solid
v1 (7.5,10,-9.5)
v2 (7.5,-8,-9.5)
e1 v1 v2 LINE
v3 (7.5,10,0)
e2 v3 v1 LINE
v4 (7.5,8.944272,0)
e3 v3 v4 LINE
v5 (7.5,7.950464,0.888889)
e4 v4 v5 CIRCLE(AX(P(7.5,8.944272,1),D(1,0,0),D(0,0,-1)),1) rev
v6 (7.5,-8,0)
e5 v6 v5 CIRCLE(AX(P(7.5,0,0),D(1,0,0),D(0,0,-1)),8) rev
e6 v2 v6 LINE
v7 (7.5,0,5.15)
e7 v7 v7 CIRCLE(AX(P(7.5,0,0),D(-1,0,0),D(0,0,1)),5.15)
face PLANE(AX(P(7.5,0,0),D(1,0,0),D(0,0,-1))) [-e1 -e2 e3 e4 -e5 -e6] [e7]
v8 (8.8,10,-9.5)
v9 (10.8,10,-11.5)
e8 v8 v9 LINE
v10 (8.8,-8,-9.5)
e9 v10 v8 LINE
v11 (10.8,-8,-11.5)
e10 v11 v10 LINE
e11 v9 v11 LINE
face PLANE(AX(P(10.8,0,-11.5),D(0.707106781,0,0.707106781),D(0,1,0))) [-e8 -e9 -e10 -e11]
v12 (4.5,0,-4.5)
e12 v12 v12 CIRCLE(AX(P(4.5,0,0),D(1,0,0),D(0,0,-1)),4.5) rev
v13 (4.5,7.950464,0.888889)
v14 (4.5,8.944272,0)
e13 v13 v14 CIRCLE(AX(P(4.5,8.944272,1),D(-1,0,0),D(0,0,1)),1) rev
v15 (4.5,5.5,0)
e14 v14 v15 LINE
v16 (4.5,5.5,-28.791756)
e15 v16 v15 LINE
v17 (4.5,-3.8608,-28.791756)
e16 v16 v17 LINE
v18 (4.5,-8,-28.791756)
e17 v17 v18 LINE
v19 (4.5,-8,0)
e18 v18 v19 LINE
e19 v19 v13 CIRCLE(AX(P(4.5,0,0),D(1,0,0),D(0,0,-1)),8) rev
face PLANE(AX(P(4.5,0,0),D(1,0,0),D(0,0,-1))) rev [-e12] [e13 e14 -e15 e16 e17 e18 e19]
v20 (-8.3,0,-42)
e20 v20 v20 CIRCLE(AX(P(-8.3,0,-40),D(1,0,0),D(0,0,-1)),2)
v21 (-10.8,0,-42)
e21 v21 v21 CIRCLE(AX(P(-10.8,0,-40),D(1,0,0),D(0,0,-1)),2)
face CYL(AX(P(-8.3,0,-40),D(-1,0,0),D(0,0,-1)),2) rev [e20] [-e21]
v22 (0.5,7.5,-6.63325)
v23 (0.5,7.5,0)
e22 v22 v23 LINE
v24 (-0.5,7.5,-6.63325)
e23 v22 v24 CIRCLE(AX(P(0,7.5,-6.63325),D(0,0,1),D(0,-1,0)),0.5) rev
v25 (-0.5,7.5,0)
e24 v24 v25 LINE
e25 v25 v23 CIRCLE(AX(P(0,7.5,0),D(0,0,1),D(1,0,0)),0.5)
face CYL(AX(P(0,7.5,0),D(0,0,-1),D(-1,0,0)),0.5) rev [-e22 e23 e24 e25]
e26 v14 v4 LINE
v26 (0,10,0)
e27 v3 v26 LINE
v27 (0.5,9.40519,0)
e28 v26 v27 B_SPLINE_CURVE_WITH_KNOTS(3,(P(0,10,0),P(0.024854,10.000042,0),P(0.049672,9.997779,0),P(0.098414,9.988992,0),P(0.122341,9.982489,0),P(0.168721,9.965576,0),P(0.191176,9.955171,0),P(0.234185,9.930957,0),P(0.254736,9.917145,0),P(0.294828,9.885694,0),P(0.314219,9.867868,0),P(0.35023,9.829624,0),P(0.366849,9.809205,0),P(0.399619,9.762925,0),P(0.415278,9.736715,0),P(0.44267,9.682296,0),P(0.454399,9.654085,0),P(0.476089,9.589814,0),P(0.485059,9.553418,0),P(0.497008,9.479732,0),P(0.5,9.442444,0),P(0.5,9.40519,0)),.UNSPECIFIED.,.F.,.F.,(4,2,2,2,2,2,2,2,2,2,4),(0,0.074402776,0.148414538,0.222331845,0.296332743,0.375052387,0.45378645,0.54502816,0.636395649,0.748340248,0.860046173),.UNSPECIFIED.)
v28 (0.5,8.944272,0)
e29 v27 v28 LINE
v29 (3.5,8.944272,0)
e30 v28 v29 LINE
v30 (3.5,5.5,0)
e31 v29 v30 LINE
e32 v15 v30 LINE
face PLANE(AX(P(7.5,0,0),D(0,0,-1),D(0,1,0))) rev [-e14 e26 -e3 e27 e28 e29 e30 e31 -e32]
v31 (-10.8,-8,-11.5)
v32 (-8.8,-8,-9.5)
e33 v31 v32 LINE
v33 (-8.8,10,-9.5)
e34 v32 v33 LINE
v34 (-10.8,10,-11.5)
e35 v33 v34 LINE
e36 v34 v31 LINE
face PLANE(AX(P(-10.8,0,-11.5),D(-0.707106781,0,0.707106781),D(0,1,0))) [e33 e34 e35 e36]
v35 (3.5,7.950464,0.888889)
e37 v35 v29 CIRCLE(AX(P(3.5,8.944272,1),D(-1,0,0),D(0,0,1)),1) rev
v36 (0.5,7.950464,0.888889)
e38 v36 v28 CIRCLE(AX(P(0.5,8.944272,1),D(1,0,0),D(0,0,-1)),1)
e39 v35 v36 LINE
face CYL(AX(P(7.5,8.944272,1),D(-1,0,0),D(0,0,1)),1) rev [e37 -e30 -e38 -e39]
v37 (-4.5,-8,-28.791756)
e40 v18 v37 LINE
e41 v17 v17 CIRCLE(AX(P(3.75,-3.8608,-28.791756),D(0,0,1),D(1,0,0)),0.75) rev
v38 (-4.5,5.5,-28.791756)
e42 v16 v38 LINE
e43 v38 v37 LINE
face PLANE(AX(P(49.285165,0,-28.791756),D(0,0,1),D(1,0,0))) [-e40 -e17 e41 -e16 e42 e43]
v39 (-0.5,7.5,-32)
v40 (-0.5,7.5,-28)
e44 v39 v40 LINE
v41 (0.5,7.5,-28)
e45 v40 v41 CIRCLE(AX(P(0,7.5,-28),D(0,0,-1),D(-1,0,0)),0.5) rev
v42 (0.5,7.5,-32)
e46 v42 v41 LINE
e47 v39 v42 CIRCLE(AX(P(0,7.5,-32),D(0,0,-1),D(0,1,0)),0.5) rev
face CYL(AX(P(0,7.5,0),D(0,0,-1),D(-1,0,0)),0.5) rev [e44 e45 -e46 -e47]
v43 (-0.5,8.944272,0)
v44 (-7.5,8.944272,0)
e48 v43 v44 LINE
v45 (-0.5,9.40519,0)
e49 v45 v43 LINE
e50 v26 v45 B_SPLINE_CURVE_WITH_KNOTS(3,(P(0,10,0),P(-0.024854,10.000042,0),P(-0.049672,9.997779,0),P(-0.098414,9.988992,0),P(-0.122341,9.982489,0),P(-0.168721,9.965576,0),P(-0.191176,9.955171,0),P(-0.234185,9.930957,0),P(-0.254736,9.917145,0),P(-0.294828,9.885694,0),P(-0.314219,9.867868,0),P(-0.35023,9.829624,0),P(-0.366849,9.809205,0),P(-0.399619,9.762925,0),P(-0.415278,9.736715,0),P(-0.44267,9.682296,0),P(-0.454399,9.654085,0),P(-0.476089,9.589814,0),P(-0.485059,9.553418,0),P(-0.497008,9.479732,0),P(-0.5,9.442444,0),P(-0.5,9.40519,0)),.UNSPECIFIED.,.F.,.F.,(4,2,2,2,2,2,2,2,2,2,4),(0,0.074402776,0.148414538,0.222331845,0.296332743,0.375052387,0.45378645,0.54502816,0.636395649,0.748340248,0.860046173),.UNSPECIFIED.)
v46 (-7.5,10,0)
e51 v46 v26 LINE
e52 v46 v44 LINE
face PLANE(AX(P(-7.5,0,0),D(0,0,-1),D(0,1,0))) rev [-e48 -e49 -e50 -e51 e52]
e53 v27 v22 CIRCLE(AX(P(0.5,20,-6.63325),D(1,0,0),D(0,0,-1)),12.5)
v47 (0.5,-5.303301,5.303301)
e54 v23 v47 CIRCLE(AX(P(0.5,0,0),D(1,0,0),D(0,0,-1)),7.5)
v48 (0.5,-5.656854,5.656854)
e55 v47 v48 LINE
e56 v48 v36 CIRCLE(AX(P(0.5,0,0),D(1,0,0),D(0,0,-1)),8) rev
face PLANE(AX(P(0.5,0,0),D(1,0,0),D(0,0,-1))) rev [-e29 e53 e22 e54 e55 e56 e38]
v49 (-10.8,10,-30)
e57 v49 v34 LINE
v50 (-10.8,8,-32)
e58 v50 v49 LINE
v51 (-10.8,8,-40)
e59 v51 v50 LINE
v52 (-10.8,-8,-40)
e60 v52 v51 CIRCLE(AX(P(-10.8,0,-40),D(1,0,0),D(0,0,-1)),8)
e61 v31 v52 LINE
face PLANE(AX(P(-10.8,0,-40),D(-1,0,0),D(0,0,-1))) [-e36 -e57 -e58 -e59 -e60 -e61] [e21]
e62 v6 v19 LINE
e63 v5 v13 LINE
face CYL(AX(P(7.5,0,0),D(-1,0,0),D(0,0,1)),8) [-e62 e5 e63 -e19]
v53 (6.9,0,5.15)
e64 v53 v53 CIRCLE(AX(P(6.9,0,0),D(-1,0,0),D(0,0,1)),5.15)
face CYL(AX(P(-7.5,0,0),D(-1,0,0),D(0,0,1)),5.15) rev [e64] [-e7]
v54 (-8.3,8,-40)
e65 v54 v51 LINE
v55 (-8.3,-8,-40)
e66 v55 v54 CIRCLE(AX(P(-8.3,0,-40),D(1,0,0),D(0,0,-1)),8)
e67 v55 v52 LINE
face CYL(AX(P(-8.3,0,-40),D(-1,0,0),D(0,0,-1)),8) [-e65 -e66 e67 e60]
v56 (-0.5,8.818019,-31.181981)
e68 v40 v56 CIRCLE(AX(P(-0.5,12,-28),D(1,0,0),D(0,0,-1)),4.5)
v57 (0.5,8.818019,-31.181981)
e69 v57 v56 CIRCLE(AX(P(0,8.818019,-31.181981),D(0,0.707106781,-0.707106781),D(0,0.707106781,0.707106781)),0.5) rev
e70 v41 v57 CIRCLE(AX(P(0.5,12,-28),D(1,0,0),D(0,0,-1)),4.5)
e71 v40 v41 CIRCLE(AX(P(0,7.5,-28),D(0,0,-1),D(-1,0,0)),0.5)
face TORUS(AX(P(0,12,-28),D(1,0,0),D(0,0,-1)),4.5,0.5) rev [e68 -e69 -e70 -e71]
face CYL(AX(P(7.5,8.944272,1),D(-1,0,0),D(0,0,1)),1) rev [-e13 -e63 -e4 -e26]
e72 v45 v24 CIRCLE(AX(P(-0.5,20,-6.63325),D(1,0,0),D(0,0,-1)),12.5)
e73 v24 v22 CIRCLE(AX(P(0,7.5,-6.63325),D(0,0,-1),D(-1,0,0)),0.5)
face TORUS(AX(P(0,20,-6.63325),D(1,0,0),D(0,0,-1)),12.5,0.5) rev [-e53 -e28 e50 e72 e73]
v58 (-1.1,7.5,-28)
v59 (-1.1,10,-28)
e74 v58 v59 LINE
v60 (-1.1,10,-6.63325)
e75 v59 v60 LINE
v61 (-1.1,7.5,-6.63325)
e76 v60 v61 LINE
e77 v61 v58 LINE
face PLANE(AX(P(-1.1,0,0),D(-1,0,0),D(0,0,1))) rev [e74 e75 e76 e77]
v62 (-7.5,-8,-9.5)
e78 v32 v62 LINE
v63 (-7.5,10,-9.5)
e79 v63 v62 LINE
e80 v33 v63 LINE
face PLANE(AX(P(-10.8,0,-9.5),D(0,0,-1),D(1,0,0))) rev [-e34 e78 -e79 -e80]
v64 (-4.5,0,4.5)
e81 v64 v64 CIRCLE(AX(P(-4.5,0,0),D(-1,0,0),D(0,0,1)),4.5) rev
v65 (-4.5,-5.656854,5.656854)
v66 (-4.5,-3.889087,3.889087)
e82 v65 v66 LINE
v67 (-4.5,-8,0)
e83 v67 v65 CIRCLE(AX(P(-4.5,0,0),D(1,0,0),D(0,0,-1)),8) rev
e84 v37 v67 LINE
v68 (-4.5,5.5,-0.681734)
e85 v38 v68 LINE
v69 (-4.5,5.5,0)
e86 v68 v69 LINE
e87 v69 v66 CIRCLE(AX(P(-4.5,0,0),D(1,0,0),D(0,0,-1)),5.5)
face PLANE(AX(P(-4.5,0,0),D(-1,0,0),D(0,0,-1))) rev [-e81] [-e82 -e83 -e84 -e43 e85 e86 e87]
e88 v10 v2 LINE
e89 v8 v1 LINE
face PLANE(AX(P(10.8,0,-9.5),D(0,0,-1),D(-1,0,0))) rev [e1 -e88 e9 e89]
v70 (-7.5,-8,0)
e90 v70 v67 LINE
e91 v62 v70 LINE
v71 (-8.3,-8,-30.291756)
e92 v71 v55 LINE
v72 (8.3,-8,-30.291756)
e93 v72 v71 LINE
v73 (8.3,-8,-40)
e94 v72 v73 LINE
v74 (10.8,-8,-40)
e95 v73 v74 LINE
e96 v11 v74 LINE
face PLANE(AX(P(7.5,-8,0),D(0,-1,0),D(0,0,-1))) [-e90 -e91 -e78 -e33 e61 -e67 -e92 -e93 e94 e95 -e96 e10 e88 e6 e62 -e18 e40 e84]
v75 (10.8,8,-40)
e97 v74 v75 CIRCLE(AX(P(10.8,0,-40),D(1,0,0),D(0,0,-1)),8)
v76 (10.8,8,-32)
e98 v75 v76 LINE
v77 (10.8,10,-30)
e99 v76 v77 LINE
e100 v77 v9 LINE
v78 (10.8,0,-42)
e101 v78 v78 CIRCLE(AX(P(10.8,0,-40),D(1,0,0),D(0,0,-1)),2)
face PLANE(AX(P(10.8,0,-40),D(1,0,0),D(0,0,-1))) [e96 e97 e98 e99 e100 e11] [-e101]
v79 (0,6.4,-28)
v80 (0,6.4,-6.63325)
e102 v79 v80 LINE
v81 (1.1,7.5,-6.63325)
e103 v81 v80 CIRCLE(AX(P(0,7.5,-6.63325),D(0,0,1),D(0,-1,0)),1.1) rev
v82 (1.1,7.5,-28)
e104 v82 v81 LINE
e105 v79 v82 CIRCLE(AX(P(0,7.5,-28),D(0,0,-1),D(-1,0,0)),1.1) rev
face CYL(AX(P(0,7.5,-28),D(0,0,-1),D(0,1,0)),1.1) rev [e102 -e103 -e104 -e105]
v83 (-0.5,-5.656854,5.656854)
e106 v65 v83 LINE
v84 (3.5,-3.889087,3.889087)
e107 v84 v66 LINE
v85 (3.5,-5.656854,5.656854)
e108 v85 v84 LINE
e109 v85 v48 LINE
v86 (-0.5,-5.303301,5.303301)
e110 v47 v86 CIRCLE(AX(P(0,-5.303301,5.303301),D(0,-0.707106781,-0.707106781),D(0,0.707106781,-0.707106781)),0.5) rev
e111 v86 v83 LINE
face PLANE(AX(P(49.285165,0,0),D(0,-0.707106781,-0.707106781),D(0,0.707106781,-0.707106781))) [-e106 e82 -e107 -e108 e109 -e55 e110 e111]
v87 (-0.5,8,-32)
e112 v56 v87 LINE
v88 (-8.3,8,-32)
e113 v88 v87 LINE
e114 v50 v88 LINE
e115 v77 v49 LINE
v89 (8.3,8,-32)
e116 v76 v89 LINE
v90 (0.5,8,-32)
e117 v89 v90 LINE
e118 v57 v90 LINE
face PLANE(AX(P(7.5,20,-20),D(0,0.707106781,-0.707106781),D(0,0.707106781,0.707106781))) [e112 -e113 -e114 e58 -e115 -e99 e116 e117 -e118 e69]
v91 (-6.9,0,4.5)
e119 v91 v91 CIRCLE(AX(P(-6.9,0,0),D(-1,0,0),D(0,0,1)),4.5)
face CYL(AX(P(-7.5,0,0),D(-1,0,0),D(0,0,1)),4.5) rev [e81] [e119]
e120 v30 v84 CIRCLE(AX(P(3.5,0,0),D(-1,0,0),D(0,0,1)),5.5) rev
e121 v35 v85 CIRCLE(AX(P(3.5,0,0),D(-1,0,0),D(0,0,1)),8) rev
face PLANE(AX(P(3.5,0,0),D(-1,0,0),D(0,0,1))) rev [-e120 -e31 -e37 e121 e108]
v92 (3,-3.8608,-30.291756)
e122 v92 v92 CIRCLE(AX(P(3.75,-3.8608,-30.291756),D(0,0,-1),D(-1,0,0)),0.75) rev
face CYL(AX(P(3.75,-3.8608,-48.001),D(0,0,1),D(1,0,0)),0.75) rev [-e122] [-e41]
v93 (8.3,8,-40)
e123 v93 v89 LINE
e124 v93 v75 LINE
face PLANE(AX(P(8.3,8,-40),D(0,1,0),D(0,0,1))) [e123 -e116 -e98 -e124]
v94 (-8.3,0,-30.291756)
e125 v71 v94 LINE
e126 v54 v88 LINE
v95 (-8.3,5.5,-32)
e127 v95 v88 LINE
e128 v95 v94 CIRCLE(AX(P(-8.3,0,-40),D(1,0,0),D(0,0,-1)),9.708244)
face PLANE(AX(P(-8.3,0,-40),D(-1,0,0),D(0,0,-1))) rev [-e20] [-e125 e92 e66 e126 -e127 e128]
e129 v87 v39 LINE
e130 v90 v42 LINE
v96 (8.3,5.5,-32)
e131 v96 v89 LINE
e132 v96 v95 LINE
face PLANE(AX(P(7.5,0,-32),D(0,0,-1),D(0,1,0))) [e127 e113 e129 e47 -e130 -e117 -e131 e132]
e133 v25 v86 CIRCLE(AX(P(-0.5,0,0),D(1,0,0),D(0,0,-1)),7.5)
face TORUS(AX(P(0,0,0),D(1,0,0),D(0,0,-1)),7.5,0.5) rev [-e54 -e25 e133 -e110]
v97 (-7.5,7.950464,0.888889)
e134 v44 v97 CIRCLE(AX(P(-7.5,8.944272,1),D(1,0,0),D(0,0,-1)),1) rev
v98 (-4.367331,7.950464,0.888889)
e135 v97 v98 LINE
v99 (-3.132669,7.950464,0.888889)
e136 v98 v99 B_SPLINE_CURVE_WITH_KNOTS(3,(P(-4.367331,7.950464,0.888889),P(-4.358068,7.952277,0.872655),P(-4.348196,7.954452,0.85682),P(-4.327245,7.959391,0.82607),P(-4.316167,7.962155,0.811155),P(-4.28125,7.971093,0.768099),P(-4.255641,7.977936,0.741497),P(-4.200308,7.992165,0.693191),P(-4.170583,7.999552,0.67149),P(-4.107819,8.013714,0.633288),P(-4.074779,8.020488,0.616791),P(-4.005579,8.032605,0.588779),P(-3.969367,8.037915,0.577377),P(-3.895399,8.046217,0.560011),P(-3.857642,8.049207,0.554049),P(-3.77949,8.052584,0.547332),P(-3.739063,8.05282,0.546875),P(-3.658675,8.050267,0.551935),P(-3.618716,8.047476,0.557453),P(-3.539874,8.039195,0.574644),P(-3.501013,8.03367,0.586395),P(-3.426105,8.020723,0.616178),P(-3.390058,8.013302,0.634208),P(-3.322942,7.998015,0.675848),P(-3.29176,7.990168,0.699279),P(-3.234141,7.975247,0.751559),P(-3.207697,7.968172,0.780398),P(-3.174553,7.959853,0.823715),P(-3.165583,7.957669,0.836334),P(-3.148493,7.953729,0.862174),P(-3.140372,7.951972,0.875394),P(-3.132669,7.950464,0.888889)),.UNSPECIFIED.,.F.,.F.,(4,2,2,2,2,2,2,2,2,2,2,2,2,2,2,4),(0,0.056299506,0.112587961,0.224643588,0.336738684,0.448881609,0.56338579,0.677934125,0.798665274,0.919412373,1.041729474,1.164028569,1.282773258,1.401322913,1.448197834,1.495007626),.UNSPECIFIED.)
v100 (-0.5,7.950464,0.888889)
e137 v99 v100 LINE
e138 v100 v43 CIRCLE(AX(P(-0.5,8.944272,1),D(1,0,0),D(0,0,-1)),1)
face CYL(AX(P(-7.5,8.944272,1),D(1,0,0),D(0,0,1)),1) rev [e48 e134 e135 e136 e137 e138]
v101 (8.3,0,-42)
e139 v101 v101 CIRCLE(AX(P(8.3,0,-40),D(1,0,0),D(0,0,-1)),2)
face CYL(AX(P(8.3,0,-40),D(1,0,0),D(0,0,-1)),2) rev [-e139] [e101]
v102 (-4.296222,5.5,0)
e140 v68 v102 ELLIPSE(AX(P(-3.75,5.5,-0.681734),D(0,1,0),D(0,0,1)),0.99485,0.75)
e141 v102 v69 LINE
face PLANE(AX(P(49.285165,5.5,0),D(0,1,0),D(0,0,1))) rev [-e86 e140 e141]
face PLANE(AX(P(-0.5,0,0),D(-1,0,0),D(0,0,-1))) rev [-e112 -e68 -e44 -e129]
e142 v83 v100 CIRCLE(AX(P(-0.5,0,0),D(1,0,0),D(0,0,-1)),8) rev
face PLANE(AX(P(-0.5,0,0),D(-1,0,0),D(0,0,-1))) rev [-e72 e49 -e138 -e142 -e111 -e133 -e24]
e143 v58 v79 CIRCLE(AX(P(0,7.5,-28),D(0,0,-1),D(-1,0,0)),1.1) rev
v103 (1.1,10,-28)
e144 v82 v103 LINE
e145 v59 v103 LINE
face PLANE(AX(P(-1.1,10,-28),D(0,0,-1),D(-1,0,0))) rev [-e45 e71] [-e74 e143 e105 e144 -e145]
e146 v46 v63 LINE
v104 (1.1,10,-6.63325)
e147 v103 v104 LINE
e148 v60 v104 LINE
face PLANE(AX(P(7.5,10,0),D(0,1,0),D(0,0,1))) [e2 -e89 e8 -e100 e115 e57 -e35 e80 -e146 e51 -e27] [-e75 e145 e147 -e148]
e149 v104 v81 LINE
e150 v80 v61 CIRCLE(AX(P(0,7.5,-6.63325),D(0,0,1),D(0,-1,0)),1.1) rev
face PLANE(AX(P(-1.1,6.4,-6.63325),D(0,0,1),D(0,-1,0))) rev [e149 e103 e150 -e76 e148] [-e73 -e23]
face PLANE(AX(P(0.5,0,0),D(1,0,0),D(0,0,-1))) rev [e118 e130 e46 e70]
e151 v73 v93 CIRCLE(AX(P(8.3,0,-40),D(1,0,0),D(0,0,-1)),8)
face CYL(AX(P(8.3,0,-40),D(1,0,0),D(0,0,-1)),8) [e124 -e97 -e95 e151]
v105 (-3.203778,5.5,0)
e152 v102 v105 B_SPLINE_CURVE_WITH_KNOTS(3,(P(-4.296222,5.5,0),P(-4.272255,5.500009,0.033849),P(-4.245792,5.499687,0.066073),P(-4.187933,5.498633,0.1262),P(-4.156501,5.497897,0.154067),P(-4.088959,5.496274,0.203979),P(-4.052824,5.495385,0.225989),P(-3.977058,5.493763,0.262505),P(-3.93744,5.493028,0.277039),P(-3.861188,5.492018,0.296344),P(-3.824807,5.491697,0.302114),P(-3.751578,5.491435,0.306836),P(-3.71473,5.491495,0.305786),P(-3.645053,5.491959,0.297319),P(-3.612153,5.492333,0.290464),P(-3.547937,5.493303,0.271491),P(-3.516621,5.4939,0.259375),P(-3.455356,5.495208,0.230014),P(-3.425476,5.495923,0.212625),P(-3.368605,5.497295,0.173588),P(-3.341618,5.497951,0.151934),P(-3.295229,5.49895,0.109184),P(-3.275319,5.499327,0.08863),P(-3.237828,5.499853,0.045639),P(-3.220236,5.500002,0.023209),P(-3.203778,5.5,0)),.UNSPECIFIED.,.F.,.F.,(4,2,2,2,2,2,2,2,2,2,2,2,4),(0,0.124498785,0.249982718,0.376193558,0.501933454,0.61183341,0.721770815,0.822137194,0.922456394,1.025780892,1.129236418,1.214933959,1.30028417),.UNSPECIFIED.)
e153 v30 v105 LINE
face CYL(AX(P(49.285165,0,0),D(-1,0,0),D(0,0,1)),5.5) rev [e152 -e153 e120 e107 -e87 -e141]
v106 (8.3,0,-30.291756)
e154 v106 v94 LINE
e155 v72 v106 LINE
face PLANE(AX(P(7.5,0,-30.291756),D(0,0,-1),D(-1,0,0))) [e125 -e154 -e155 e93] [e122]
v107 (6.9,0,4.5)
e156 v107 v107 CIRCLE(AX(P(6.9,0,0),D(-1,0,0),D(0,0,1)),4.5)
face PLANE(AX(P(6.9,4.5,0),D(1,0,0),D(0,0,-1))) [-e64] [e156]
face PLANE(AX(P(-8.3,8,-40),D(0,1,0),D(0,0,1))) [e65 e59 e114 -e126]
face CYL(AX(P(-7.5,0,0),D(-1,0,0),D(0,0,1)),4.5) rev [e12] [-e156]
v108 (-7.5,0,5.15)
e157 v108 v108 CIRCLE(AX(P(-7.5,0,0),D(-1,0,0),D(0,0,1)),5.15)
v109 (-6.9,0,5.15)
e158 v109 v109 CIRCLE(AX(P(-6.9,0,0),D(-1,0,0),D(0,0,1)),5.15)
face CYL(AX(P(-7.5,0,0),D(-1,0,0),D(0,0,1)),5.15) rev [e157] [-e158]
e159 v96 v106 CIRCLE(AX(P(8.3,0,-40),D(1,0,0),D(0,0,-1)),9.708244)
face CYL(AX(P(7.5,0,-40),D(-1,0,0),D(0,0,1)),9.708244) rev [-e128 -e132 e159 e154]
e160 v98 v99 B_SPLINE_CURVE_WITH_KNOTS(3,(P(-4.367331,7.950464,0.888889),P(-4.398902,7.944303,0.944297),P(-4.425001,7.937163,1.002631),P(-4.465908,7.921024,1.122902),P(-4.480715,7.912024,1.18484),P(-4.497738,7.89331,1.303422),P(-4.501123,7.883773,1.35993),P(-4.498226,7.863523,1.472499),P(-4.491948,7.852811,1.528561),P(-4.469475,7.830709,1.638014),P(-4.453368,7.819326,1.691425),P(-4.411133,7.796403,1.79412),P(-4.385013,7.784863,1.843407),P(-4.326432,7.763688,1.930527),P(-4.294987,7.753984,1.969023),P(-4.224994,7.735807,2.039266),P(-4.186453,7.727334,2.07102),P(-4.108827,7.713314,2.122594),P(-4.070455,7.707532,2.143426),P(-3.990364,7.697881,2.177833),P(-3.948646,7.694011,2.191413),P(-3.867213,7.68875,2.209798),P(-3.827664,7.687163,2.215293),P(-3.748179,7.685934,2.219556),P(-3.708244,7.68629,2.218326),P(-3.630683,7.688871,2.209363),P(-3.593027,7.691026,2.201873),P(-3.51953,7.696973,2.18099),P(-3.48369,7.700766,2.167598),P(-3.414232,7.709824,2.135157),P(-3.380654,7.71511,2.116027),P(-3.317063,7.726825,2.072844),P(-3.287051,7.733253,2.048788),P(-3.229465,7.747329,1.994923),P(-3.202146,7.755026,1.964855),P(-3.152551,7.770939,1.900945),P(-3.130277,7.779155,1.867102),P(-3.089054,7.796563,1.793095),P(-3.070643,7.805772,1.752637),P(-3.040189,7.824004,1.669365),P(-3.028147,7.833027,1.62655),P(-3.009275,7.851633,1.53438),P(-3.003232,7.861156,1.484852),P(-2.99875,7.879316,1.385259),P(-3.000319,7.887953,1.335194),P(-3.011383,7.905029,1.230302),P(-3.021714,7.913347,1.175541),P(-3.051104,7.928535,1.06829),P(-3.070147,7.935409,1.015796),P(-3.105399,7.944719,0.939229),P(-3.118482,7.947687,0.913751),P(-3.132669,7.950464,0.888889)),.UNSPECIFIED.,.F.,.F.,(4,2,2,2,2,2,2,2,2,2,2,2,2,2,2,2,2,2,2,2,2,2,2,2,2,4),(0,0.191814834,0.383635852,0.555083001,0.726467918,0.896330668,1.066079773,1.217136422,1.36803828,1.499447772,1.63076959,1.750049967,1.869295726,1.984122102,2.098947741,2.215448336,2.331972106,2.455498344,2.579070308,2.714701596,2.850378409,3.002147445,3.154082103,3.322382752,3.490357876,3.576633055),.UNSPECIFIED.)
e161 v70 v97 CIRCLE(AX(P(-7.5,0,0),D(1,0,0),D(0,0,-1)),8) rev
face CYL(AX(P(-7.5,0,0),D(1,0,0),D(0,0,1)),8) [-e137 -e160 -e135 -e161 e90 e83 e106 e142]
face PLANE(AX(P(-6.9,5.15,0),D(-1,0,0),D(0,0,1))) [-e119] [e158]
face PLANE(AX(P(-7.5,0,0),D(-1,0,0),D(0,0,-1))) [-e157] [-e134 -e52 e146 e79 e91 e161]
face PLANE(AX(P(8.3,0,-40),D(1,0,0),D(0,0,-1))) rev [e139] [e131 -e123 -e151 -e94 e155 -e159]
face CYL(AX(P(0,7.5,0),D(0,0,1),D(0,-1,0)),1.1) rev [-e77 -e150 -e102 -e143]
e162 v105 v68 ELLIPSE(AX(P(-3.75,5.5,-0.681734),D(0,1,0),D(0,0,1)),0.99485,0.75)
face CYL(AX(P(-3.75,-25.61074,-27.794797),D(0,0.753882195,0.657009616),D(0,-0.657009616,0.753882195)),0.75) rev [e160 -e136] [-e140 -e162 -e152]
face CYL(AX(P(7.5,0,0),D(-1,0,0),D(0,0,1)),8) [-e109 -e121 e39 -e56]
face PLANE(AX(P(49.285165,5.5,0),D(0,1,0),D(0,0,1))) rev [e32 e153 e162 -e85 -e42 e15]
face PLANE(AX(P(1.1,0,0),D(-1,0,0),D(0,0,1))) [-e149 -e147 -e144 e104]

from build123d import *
from build123d.topology import SkipClean

# Parameters (mm, degrees)
BOSS_EXTRU_1_START      = 4.5
ESQUISSE1_R             = 2
BOSS_EXTRU_1_DEPTH      = 3
BOSS_EXTRU_2_START      = 7.5
BOSS_EXTRU_2_DEPTH      = 3.3
BOSS_EXTRU_5_START      = 8.3
ESQUISSE1_12_R          = 2
BOSS_EXTRU_5_DEPTH      = 2.5
BOSS_EXTRU_3_DEPTH      = 7.5
BOSS_EXTRU_4_START      = 0.5
BOSS_EXTRU_4_DEPTH      = 7
CONG_4_R                = 12
FILLET1_R               = 0.5
FILLET2_R               = 1
CHAMFER1_SIZE           = 2
ENL_V_START             = 4.5
ESQUISSE2_W             = 8
ESQUISSE2_H             = 18
ENL_V_MAT_EXTRU_1_DEPTH = 1
ENL_V_MAT_EXTRU_3_REACH = 52.206
ESQUISSE4_R             = 0.75
ESQUISSE5_W             = 21.366750419
ESQUISSE5_H             = 3.6
ENL_V_MAT_EXTRU_4_DEPTH = 1.1
CONG_5_R                = 1.1
ENL_V_MAT_EXTRU_5_REACH = 59.505
ESQUISSE12_R            = 0.75


# Some blends are built 0.0001 mm under size
with BuildPart() as part:
    # Esquisse1 → Boss.-Extru.1 (new body)
    with BuildSketch(Plane(origin=(0, 0, 0), x_dir=(0, 0, -1), z_dir=(1, 0, 0)).offset(BOSS_EXTRU_1_START)):
        with BuildLine():
            Line((30, 10), (0, 10))
            Line((0, 10), (0, 8))
            ThreePointArc((0, 8), (-8, 0), (0, -8))
            Line((0, -8), (30.291756081, -8))
            Line((30.291756081, -8), (30.291756081, 0))
            ThreePointArc((30.291756081, 0), (30.728647581, 2.879587526), (32, 5.5))
            Line((32, 5.5), (32, 8))
            Line((32, 8), (30, 10))
        make_face()
        Circle(ESQUISSE1_R, mode=Mode.SUBTRACT)
    extrude(amount=BOSS_EXTRU_1_DEPTH)

    # Esquisse1<8> → Boss.-Extru.2 (add)
    with BuildSketch(Plane(origin=(0, 0, 0), x_dir=(0, 0, -1), z_dir=(1, 0, 0)).offset(BOSS_EXTRU_2_START)):
        with BuildLine():
            Line((30, 10), (9.5, 10))
            Line((9.5, 10), (9.5, -8))
            Line((9.5, -8), (30.291756081, -8))
            Line((30.291756081, -8), (30.291756081, 0))
            ThreePointArc((30.291756081, 0), (30.728647581, 2.879587526), (32, 5.5))
            Line((32, 5.5), (32, 8))
            Line((32, 8), (30, 10))
        make_face()
    extrude(amount=BOSS_EXTRU_2_DEPTH)

    # Esquisse1<12> → Boss.-Extru.5 (add)
    with BuildSketch(Plane(origin=(0, 0, 0), x_dir=(0, 0, -1), z_dir=(1, 0, 0)).offset(BOSS_EXTRU_5_START)):
        with BuildLine():
            Line((40, 8), (32, 8))
            Line((32, 8), (32, 7))
            Line((32, 7), (32, 5.5))
            ThreePointArc((32, 5.5), (30.728647581, 2.879587526), (30.291756081, 0))
            Line((30.291756081, 0), (30.291756081, -8))
            Line((30.291756081, -8), (40, -8))
            ThreePointArc((40, -8), (48, 0), (40, 8))
        make_face()
        with Locations((40, 0)):
            Circle(ESQUISSE1_12_R, mode=Mode.SUBTRACT)
    extrude(amount=BOSS_EXTRU_5_DEPTH)

    # Esquisse1<9> → Boss.-Extru.3 (add)
    with BuildSketch(Plane(origin=(0, 0, 0), x_dir=(0, 0, -1), z_dir=(1, 0, 0))):
        with BuildLine():
            Line((0, 10), (2, 8))
            Line((2, 8), (28, 8))
            ThreePointArc((28, 8), (29.530733729, 8.30448187), (30.828427125, 9.171572875))
            Line((30.828427125, 9.171572875), (30, 10))
            Line((30, 10), (0, 10))
        make_face()
        with BuildLine():
            Line((0, 5.5), (28.791756081, 5.5))
            Line((28.791756081, 5.5), (28.791756081, -8))
            Line((28.791756081, -8), (30.291756081, -8))
            Line((30.291756081, -8), (30.291756081, 0))
            ThreePointArc((30.291756081, 0), (30.728647581, 2.879587526), (32, 5.5))
            Line((32, 5.5), (32, 7))
            Line((32, 7), (0, 7))
            ThreePointArc((0, 7), (-6.467156728, 2.678784027), (-4.949747468, -4.949747468))
            Line((-4.949747468, -4.949747468), (-3.889087297, -3.889087297))
            ThreePointArc((-3.889087297, -3.889087297), (-5.081337429, 2.104758878), (0, 5.5))
        make_face()
    extrude(amount=BOSS_EXTRU_3_DEPTH)

    # Esquisse1<10> → Boss.-Extru.4 (add)
    with BuildSketch(Plane(origin=(0, 0, 0), x_dir=(0, 0, -1), z_dir=(1, 0, 0)).offset(BOSS_EXTRU_4_START)):
        with BuildLine():
            Line((2, 8), (0, 10))
            Line((0, 10), (0, 8))
            ThreePointArc((0, 8), (-7.39103626, 3.061467459), (-5.656854249, -5.656854249))
            Line((-5.656854249, -5.656854249), (-4.949747468, -4.949747468))
            ThreePointArc((-4.949747468, -4.949747468), (-6.467156728, 2.678784027), (0, 7))
            Line((0, 7), (32, 7))
            Line((32, 7), (32, 8))
            Line((32, 8), (30.828427125, 9.171572875))
            ThreePointArc((30.828427125, 9.171572875), (29.530733729, 8.30448187), (28, 8))
            Line((28, 8), (2, 8))
        make_face()
    extrude(amount=BOSS_EXTRU_4_DEPTH)

    # Congé4
    # the kernel refuses this fillet: 12 mm, written as the material it takes off along each edge
    with BuildSketch(Plane(origin=(-11.583123952, 8, -2), x_dir=(0, 0, -1), z_dir=(1, 0, 0))) as cong_4_piece_1:
        with BuildLine():
            CenterArc((4.633249581, 12), CONG_4_R, 236.442690238, 33.557309762)
            Line((-2, 2), (-2.132664992, 1.8))
            ThreePointArc((-2.132664992, 1.8), (-1.169705627, 0.830294373), (-0.169705627, -0.169705627))
            Line((-0.169705627, -0.169705627), (0, -0.24))
            Line((0, -0.24), (4.633249581, -0.24))
            Line((4.633249581, -0.24), (4.633249581, 0))
        make_face()
    extrude(amount=12.083123952, mode=Mode.SUBTRACT)

    # Fillet1
    # the kernel refuses this fillet: 0.5 mm, written as the material it adds along each edge
    with BuildSketch(Plane(origin=(0.5, 20, -6.633249581), x_dir=(0, -0.7713363788823462, 0.6364276790120538), z_dir=(0, 0.6364276790120538, 0.7713363788823462))) as fillet1_piece_1_section:
        with BuildLine():
            CenterArc((12 + FILLET1_R, -FILLET1_R), FILLET1_R, 90, 90)
            Line((12 + FILLET1_R, 0), (12, 0))
            Line((12, 0), (12, -FILLET1_R))
        make_face()
    fillet1_piece_1 = revolve(axis=Axis((0.5, 20, -6.633249581), (1, 0, 0)), revolution_arc=39.525953359, mode=Mode.PRIVATE)
    fillet1_piece_1 = split(fillet1_piece_1, bisect_by=Plane(origin=(0.358961784, 10, -3.12843374), z_dir=(0, -1, 0)), keep=Keep.TOP, mode=Mode.PRIVATE)
    fillet1_piece_1 = split(fillet1_piece_1, bisect_by=Plane(origin=(0.358961784, 8.375840896, 0), z_dir=(0, 0, -1)), keep=Keep.TOP, mode=Mode.PRIVATE)
    add(fillet1_piece_1)
    with BuildSketch(Plane(origin=(0.5, 8, -28), x_dir=(-1, 0, 0), z_dir=(0, 0, 1))) as fillet1_piece_2:
        with BuildLine():
            CenterArc((FILLET1_R, FILLET1_R), FILLET1_R, 180, 90)
            Line((0, FILLET1_R), (0, 0))
            Line((0, 0), (FILLET1_R, 0))
        make_face()
    extrude(amount=21.366750419)
    with BuildSketch(Plane(origin=(0.5, 7, 0), x_dir=(-1, 0, 0), z_dir=(0, 0, -1))) as fillet1_piece_3:
        with BuildLine():
            CenterArc((FILLET1_R, FILLET1_R), FILLET1_R, 180, 90)
            Line((0, FILLET1_R), (0, 0))
            Line((0, 0), (FILLET1_R, 0))
        make_face()
    extrude(amount=32)
    with BuildSketch(Plane(origin=(0.5, 0, 0), x_dir=(0, -0.7071067811865441, 0.7071067811865509), z_dir=(0, -0.7071067811865509, -0.7071067811865441))) as fillet1_piece_4:
        with BuildLine():
            CenterArc((7 + FILLET1_R, FILLET1_R), FILLET1_R, 180, 90)
            Line((7 + FILLET1_R, 0), (7, 0))
            Line((7, 0), (7, FILLET1_R))
        make_face()
    revolve(axis=Axis((0.5, 0, 0), (-1, 0, 0)), revolution_arc=135)
    with BuildSketch(Plane(origin=(0.5, 12, -28), x_dir=(0, -0.7071067811865426, -0.7071067811865523), z_dir=(0, 0.7071067811865523, -0.7071067811865426))) as fillet1_piece_5:
        with BuildLine():
            CenterArc((4 + FILLET1_R, FILLET1_R), FILLET1_R, 180, 90)
            Line((4 + FILLET1_R, 0), (4, 0))
            Line((4, 0), (4, FILLET1_R))
        make_face()
    revolve(axis=Axis((0.5, 12, -28), (-1, 0, 0)), revolution_arc=45)

    # Fillet2
    fillet2_edges = [part.edges().sort_by_distance(p)[0] for p in [
        (4, 8, 0),
    ]]
    fillet(fillet2_edges, radius=FILLET2_R)

    # Chamfer1
    chamfer1_edges = [part.edges().sort_by_distance(p)[0] for p in [
        (10.8, 1, -9.5),
    ]]
    chamfer(chamfer1_edges, length=CHAMFER1_SIZE)

    # Symétrie1: part across plane


with BuildPart() as part_1:
    add(part.part)
    add(part.part.mirror(Plane(origin=(0, 0, 0), x_dir=(0, 0, 1), z_dir=(1, 0, 0))))

    # Esquisse2 → Enlèv. mat.-Extru.1 (cut)
    with SkipClean():  # the faces are left unmerged after this step: merging them gives an invalid solid
        with BuildSketch(Plane(origin=(0, 0, 0), x_dir=(0, 0, -1), z_dir=(1, 0, 0)).offset(ENL_V_START)):
            with Locations((-4, 1)):
                Rectangle(ESQUISSE2_W, ESQUISSE2_H)
        extrude(amount=-ENL_V_MAT_EXTRU_1_DEPTH, mode=Mode.SUBTRACT)

    # Esquisse4 → Enlèv. mat.-Extru.3 (cut, up to next)
    with BuildSketch(Plane.XY, mode=Mode.PRIVATE) as enl_v_mat_extru_3_sk1:
        with Locations((3.75, -3.8608)):
            Circle(ESQUISSE4_R)
    enl_v_mat_extru_3_tool1 = extrude(enl_v_mat_extru_3_sk1.sketch, amount=-ENL_V_MAT_EXTRU_3_REACH, mode=Mode.PRIVATE) & part_1.part
    add(enl_v_mat_extru_3_tool1.solids().sort_by_distance((3.75, -3.8608, 0))[0], mode=Mode.SUBTRACT)

    # Esquisse5 → Enlèv. mat.-Extru.4 (cut, symmetric)
    with SkipClean():  # the faces are left unmerged after this step: merging them gives an invalid solid
        with BuildSketch(Plane(origin=(0, 0, 0), x_dir=(0, 0, -1), z_dir=(1, 0, 0))):
            with Locations((17.316624791, 8.2)):
                Rectangle(ESQUISSE5_W, ESQUISSE5_H)
        extrude(amount=ENL_V_MAT_EXTRU_4_DEPTH, both=True, mode=Mode.SUBTRACT)

    # Congé5
    cong_5_edges = [part_1.edges().sort_by_distance(p)[0] for p in [
        (1.1, 6.4, -17.31662479),
        (-1.1, 6.4, -17.31662479),
    ]]
    fillet(cong_5_edges, radius=CONG_5_R - 0.0001)  # a hair under: the kernel refuses the full size

    # Esquisse10 → Enlèvement de matière-Révolution1 (revolve, cut)
    with BuildSketch(Plane.XY, mode=Mode.PRIVATE) as enl_vement_de_mati_re_r_volution1_sk:
        Polygon((-7.5, 5.15), (-6.9, 5.15), (-6.9, 4.5), (6.9, 4.5), (6.9, 5.15), (7.5, 5.15), (7.5, 2), (-7.5, 2), align=None)
    revolve(enl_vement_de_mati_re_r_volution1_sk.sketch.rotate(Axis((-7.5, 0, 0), (1, 0, 0)), 90), axis=Axis((-7.5, 0, 0), (1, 0, 0)), mode=Mode.SUBTRACT)

    # Esquisse12 → Enlèv. mat.-Extru.5 (cut, up to next)
    with BuildSketch(Plane(origin=(0, 7.263410428, 6.380108848), x_dir=(1, 0, 0), z_dir=(0, -0.7538821952908842, -0.6570096160813761)), mode=Mode.PRIVATE) as enl_v_mat_extru_5_sk1:
        with Locations(Location((-3.75, -4.165219968, 0), (0, 0, 136.743720403))):
            Circle(ESQUISSE12_R)
    enl_v_mat_extru_5_tool1 = extrude(enl_v_mat_extru_5_sk1.sketch, amount=ENL_V_MAT_EXTRU_5_REACH, mode=Mode.PRIVATE) & part_1.part
    add(enl_v_mat_extru_5_tool1.solids().sort_by_distance((-3.75, 10, 3.240024))[0], mode=Mode.SUBTRACT)


solid = part_1.part
